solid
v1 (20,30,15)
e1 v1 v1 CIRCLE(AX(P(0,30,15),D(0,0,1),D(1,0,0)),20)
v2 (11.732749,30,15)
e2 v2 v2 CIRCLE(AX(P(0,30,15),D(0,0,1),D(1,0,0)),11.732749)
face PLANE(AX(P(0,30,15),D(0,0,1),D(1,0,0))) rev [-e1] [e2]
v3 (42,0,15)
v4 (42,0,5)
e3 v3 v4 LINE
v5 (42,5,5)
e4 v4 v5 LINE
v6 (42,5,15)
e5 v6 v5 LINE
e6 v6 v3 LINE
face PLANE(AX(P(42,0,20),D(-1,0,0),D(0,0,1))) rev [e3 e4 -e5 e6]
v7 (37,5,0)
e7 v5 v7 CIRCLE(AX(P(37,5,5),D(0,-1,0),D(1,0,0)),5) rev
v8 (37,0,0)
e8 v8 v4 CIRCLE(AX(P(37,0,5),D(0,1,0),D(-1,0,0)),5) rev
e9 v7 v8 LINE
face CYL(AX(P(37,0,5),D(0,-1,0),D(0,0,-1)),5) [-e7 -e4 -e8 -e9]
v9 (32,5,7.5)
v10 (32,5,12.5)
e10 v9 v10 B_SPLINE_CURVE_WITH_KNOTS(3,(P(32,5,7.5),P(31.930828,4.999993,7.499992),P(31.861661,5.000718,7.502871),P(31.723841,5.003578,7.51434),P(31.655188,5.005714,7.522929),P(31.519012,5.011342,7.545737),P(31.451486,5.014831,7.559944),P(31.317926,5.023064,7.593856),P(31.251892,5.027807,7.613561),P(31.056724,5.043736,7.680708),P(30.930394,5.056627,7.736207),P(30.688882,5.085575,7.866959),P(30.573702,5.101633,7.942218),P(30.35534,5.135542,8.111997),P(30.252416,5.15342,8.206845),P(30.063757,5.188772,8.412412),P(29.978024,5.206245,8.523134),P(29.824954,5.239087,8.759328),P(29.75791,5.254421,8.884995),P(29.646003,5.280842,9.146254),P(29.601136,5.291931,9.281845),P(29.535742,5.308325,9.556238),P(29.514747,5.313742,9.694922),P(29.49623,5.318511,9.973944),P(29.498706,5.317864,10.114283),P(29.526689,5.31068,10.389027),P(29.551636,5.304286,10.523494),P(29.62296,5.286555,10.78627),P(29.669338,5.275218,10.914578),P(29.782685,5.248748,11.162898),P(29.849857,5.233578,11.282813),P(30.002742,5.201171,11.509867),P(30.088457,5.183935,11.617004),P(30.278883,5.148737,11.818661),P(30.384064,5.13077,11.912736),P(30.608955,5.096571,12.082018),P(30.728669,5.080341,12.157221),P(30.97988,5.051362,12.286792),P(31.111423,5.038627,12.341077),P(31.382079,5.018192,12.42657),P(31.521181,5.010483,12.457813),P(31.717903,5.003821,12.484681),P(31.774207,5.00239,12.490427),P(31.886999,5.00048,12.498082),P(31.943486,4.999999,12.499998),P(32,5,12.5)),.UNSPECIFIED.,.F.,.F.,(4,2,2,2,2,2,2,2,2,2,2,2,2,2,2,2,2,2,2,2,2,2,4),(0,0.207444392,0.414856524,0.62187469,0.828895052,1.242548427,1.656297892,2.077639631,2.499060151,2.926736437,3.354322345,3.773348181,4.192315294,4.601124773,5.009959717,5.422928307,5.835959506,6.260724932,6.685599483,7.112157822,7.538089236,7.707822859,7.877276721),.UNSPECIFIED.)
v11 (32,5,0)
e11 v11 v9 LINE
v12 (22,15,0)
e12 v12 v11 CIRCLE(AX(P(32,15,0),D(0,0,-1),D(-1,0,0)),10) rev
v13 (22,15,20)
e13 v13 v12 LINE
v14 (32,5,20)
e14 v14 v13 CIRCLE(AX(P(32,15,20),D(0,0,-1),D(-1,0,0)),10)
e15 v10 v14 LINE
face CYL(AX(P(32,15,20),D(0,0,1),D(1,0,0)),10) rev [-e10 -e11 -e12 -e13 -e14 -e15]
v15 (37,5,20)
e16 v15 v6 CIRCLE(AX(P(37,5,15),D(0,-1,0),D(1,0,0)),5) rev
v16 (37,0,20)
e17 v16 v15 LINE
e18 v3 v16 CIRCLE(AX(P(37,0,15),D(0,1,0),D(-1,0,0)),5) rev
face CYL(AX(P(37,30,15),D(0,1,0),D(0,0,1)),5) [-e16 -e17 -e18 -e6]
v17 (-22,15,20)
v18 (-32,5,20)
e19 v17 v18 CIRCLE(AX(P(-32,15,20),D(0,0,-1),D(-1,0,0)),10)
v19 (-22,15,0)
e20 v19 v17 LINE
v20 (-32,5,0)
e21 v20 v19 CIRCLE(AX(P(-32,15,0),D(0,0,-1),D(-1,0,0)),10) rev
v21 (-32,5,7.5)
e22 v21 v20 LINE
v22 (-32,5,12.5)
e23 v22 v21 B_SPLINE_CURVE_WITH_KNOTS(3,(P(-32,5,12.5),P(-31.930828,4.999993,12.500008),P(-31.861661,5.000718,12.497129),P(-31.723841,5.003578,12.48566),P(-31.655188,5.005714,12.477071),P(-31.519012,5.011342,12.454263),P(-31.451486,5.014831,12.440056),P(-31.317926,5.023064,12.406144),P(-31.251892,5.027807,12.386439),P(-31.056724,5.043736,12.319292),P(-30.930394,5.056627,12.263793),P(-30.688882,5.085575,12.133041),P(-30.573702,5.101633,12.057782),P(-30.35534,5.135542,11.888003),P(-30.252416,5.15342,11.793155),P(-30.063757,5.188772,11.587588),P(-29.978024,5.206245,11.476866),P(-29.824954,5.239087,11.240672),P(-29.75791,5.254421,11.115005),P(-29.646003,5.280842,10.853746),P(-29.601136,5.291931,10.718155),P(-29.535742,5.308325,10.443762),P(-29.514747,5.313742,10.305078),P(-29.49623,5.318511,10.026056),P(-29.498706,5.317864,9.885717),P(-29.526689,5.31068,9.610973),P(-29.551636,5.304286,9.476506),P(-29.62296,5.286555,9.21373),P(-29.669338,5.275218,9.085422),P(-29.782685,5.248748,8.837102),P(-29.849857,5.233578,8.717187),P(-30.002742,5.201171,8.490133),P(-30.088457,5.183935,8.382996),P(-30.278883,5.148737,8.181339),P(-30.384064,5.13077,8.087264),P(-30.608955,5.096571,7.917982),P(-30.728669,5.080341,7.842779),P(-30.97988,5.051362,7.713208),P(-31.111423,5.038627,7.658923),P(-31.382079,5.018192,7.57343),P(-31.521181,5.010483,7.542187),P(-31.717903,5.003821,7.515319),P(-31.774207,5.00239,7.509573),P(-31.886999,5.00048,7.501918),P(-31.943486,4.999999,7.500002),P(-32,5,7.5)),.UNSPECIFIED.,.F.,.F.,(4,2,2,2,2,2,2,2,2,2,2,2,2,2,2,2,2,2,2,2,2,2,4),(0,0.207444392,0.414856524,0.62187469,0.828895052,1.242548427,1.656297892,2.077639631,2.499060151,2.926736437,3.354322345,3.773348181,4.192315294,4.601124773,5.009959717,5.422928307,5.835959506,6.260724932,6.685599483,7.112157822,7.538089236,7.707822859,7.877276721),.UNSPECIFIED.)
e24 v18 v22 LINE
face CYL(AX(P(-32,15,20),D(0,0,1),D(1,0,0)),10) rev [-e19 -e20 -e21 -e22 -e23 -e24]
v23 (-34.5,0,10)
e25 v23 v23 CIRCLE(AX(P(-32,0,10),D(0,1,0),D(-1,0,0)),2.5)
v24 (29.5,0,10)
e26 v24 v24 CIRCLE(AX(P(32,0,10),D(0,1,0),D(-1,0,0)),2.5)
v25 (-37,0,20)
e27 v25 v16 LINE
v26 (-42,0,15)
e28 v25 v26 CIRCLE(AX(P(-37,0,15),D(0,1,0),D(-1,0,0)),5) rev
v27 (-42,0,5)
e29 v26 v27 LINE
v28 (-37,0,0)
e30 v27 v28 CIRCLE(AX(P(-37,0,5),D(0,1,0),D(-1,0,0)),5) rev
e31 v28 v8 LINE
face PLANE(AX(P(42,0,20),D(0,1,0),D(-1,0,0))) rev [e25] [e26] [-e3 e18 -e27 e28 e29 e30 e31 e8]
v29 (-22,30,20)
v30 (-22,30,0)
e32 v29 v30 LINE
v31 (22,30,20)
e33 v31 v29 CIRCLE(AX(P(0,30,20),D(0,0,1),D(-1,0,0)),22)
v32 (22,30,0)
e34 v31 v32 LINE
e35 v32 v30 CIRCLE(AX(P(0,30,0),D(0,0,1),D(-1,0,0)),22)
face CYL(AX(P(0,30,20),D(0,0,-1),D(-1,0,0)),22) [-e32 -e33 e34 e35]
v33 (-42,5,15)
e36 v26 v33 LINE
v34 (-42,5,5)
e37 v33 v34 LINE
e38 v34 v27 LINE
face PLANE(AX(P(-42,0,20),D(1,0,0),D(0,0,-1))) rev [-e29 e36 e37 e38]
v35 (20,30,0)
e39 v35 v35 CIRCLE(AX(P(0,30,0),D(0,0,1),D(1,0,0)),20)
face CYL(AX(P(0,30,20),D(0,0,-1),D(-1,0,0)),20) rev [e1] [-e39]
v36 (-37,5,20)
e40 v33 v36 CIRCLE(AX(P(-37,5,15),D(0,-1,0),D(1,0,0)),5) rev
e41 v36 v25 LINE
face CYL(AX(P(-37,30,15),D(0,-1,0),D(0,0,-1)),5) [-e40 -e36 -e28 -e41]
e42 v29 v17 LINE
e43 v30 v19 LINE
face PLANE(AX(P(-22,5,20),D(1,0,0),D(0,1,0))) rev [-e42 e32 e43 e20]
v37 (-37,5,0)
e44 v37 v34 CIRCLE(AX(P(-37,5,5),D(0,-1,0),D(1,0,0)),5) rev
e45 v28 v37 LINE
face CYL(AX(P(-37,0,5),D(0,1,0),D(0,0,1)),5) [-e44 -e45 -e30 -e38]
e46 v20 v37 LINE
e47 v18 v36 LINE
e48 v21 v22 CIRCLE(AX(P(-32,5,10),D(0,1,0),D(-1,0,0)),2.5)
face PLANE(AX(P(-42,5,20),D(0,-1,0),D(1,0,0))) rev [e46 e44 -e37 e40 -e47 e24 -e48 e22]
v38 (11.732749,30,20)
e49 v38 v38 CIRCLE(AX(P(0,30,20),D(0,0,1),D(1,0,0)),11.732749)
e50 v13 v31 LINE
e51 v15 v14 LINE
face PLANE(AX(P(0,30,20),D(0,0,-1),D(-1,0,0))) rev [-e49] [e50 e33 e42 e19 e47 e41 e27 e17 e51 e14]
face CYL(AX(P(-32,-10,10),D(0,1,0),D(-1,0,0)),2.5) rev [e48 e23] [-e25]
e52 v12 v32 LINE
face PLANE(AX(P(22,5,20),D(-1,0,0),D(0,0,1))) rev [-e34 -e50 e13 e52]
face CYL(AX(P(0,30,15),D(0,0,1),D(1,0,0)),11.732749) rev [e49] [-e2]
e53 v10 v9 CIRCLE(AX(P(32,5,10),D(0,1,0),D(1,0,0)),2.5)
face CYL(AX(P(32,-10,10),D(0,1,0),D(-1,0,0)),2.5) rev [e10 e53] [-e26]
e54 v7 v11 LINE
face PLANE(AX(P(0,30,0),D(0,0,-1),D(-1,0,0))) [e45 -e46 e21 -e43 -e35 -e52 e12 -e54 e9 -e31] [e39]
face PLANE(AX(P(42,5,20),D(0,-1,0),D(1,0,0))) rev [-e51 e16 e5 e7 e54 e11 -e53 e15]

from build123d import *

# Parameters (mm, degrees)
ESQUISSE1_R             = 20
BOSS_EXTRU_1_DEPTH      = 20
ESQUISSE2_R             = 2.5
ENL_V_MAT_EXTRU_1_DEPTH = 15
CONG_1_R                = 10
CONG_2_R                = 5
BOSS_EXTRU_2_START      = -5
ESQUISSE3_R             = 20
ESQUISSE3_R_2           = 11.732748591
BOSS_EXTRU_2_DEPTH      = 5


with BuildPart() as part:
    # Esquisse1 → Boss.-Extru.1 (new body)
    with BuildSketch(Plane.XY):
        with BuildLine():
            Line((42, 0), (-42, 0))
            Line((-42, 0), (-42, 5))
            Line((-42, 5), (-22, 5))
            Line((-22, 5), (-22, 30))
            ThreePointArc((-22, 30), (0, 52), (22, 30))
            Line((22, 30), (22, 5))
            Line((22, 5), (42, 5))
            Line((42, 5), (42, 0))
        make_face()
        with Locations((0, 30)):
            Circle(ESQUISSE1_R, mode=Mode.SUBTRACT)
    extrude(amount=BOSS_EXTRU_1_DEPTH)

    # Esquisse2 → Enlèv. mat.-Extru.1 (cut)
    with BuildSketch(Plane(origin=(0, 5, 0), x_dir=(1, 0, 0), z_dir=(0, 1, 0))):
        with Locations(Location((-32, -10, 0), (0, 0, 180))):
            Circle(ESQUISSE2_R)
        with Locations(Location((32, -10, 0), (0, 0, 180))):
            Circle(ESQUISSE2_R)
    extrude(amount=-ENL_V_MAT_EXTRU_1_DEPTH, mode=Mode.SUBTRACT)

    # Congé1
    # the kernel refuses this fillet: 10 mm, written as the material it adds along each edge
    with BuildSketch(Plane(origin=(-22, 5, 0), x_dir=(-1, 0, 0), z_dir=(0, 0, 1))) as cong_1_piece_1_section:
        with BuildLine():
            CenterArc((CONG_1_R, -CONG_1_R), CONG_1_R, 90, 90)
            Line((0, -CONG_1_R), (0, 0))
            Line((0, 0), (CONG_1_R, 0))
        make_face()
    cong_1_piece_1 = extrude(amount=20, mode=Mode.PRIVATE)
    cong_1_piece_1 = cong_1_piece_1 - Plane(origin=(-32, 7.276430514, 10), x_dir=(-1, 0, 0), z_dir=(0, 1, 0)) * Cylinder(2.5, 81, mode=Mode.PRIVATE)
    add(cong_1_piece_1)
    with BuildSketch(Plane(origin=(22, 5, 0), x_dir=(1, 0, 0), z_dir=(0, 0, 1))) as cong_1_piece_2_section:
        with BuildLine():
            CenterArc((CONG_1_R, CONG_1_R), CONG_1_R, 180, 90)
            Line((0, CONG_1_R), (0, 0))
            Line((0, 0), (CONG_1_R, 0))
        make_face()
    cong_1_piece_2 = extrude(amount=20, mode=Mode.PRIVATE)
    cong_1_piece_2 = cong_1_piece_2 - Plane(origin=(32, 7.276430465, 10), x_dir=(-1, 0, 0), z_dir=(0, 1, 0)) * Cylinder(2.5, 80, mode=Mode.PRIVATE)
    add(cong_1_piece_2)

    # Congé2
    cong_2_edges = [part.edges().sort_by_distance(p)[0] for p in [
        (-42, 2.5, 20),
        (42, 2.5, 20),
        (42, 2.5, 0),
        (-42, 2.5, 0),
    ]]
    fillet(cong_2_edges, radius=CONG_2_R)

    # Esquisse3 → Boss.-Extru.2 (add)
    with BuildSketch(Plane.XY.offset(20).offset(BOSS_EXTRU_2_START)):
        with Locations((0, 30)):
            Circle(ESQUISSE3_R)
        with Locations((0, 30)):
            Circle(ESQUISSE3_R_2, mode=Mode.SUBTRACT)
    extrude(amount=BOSS_EXTRU_2_DEPTH)


solid = part.part
